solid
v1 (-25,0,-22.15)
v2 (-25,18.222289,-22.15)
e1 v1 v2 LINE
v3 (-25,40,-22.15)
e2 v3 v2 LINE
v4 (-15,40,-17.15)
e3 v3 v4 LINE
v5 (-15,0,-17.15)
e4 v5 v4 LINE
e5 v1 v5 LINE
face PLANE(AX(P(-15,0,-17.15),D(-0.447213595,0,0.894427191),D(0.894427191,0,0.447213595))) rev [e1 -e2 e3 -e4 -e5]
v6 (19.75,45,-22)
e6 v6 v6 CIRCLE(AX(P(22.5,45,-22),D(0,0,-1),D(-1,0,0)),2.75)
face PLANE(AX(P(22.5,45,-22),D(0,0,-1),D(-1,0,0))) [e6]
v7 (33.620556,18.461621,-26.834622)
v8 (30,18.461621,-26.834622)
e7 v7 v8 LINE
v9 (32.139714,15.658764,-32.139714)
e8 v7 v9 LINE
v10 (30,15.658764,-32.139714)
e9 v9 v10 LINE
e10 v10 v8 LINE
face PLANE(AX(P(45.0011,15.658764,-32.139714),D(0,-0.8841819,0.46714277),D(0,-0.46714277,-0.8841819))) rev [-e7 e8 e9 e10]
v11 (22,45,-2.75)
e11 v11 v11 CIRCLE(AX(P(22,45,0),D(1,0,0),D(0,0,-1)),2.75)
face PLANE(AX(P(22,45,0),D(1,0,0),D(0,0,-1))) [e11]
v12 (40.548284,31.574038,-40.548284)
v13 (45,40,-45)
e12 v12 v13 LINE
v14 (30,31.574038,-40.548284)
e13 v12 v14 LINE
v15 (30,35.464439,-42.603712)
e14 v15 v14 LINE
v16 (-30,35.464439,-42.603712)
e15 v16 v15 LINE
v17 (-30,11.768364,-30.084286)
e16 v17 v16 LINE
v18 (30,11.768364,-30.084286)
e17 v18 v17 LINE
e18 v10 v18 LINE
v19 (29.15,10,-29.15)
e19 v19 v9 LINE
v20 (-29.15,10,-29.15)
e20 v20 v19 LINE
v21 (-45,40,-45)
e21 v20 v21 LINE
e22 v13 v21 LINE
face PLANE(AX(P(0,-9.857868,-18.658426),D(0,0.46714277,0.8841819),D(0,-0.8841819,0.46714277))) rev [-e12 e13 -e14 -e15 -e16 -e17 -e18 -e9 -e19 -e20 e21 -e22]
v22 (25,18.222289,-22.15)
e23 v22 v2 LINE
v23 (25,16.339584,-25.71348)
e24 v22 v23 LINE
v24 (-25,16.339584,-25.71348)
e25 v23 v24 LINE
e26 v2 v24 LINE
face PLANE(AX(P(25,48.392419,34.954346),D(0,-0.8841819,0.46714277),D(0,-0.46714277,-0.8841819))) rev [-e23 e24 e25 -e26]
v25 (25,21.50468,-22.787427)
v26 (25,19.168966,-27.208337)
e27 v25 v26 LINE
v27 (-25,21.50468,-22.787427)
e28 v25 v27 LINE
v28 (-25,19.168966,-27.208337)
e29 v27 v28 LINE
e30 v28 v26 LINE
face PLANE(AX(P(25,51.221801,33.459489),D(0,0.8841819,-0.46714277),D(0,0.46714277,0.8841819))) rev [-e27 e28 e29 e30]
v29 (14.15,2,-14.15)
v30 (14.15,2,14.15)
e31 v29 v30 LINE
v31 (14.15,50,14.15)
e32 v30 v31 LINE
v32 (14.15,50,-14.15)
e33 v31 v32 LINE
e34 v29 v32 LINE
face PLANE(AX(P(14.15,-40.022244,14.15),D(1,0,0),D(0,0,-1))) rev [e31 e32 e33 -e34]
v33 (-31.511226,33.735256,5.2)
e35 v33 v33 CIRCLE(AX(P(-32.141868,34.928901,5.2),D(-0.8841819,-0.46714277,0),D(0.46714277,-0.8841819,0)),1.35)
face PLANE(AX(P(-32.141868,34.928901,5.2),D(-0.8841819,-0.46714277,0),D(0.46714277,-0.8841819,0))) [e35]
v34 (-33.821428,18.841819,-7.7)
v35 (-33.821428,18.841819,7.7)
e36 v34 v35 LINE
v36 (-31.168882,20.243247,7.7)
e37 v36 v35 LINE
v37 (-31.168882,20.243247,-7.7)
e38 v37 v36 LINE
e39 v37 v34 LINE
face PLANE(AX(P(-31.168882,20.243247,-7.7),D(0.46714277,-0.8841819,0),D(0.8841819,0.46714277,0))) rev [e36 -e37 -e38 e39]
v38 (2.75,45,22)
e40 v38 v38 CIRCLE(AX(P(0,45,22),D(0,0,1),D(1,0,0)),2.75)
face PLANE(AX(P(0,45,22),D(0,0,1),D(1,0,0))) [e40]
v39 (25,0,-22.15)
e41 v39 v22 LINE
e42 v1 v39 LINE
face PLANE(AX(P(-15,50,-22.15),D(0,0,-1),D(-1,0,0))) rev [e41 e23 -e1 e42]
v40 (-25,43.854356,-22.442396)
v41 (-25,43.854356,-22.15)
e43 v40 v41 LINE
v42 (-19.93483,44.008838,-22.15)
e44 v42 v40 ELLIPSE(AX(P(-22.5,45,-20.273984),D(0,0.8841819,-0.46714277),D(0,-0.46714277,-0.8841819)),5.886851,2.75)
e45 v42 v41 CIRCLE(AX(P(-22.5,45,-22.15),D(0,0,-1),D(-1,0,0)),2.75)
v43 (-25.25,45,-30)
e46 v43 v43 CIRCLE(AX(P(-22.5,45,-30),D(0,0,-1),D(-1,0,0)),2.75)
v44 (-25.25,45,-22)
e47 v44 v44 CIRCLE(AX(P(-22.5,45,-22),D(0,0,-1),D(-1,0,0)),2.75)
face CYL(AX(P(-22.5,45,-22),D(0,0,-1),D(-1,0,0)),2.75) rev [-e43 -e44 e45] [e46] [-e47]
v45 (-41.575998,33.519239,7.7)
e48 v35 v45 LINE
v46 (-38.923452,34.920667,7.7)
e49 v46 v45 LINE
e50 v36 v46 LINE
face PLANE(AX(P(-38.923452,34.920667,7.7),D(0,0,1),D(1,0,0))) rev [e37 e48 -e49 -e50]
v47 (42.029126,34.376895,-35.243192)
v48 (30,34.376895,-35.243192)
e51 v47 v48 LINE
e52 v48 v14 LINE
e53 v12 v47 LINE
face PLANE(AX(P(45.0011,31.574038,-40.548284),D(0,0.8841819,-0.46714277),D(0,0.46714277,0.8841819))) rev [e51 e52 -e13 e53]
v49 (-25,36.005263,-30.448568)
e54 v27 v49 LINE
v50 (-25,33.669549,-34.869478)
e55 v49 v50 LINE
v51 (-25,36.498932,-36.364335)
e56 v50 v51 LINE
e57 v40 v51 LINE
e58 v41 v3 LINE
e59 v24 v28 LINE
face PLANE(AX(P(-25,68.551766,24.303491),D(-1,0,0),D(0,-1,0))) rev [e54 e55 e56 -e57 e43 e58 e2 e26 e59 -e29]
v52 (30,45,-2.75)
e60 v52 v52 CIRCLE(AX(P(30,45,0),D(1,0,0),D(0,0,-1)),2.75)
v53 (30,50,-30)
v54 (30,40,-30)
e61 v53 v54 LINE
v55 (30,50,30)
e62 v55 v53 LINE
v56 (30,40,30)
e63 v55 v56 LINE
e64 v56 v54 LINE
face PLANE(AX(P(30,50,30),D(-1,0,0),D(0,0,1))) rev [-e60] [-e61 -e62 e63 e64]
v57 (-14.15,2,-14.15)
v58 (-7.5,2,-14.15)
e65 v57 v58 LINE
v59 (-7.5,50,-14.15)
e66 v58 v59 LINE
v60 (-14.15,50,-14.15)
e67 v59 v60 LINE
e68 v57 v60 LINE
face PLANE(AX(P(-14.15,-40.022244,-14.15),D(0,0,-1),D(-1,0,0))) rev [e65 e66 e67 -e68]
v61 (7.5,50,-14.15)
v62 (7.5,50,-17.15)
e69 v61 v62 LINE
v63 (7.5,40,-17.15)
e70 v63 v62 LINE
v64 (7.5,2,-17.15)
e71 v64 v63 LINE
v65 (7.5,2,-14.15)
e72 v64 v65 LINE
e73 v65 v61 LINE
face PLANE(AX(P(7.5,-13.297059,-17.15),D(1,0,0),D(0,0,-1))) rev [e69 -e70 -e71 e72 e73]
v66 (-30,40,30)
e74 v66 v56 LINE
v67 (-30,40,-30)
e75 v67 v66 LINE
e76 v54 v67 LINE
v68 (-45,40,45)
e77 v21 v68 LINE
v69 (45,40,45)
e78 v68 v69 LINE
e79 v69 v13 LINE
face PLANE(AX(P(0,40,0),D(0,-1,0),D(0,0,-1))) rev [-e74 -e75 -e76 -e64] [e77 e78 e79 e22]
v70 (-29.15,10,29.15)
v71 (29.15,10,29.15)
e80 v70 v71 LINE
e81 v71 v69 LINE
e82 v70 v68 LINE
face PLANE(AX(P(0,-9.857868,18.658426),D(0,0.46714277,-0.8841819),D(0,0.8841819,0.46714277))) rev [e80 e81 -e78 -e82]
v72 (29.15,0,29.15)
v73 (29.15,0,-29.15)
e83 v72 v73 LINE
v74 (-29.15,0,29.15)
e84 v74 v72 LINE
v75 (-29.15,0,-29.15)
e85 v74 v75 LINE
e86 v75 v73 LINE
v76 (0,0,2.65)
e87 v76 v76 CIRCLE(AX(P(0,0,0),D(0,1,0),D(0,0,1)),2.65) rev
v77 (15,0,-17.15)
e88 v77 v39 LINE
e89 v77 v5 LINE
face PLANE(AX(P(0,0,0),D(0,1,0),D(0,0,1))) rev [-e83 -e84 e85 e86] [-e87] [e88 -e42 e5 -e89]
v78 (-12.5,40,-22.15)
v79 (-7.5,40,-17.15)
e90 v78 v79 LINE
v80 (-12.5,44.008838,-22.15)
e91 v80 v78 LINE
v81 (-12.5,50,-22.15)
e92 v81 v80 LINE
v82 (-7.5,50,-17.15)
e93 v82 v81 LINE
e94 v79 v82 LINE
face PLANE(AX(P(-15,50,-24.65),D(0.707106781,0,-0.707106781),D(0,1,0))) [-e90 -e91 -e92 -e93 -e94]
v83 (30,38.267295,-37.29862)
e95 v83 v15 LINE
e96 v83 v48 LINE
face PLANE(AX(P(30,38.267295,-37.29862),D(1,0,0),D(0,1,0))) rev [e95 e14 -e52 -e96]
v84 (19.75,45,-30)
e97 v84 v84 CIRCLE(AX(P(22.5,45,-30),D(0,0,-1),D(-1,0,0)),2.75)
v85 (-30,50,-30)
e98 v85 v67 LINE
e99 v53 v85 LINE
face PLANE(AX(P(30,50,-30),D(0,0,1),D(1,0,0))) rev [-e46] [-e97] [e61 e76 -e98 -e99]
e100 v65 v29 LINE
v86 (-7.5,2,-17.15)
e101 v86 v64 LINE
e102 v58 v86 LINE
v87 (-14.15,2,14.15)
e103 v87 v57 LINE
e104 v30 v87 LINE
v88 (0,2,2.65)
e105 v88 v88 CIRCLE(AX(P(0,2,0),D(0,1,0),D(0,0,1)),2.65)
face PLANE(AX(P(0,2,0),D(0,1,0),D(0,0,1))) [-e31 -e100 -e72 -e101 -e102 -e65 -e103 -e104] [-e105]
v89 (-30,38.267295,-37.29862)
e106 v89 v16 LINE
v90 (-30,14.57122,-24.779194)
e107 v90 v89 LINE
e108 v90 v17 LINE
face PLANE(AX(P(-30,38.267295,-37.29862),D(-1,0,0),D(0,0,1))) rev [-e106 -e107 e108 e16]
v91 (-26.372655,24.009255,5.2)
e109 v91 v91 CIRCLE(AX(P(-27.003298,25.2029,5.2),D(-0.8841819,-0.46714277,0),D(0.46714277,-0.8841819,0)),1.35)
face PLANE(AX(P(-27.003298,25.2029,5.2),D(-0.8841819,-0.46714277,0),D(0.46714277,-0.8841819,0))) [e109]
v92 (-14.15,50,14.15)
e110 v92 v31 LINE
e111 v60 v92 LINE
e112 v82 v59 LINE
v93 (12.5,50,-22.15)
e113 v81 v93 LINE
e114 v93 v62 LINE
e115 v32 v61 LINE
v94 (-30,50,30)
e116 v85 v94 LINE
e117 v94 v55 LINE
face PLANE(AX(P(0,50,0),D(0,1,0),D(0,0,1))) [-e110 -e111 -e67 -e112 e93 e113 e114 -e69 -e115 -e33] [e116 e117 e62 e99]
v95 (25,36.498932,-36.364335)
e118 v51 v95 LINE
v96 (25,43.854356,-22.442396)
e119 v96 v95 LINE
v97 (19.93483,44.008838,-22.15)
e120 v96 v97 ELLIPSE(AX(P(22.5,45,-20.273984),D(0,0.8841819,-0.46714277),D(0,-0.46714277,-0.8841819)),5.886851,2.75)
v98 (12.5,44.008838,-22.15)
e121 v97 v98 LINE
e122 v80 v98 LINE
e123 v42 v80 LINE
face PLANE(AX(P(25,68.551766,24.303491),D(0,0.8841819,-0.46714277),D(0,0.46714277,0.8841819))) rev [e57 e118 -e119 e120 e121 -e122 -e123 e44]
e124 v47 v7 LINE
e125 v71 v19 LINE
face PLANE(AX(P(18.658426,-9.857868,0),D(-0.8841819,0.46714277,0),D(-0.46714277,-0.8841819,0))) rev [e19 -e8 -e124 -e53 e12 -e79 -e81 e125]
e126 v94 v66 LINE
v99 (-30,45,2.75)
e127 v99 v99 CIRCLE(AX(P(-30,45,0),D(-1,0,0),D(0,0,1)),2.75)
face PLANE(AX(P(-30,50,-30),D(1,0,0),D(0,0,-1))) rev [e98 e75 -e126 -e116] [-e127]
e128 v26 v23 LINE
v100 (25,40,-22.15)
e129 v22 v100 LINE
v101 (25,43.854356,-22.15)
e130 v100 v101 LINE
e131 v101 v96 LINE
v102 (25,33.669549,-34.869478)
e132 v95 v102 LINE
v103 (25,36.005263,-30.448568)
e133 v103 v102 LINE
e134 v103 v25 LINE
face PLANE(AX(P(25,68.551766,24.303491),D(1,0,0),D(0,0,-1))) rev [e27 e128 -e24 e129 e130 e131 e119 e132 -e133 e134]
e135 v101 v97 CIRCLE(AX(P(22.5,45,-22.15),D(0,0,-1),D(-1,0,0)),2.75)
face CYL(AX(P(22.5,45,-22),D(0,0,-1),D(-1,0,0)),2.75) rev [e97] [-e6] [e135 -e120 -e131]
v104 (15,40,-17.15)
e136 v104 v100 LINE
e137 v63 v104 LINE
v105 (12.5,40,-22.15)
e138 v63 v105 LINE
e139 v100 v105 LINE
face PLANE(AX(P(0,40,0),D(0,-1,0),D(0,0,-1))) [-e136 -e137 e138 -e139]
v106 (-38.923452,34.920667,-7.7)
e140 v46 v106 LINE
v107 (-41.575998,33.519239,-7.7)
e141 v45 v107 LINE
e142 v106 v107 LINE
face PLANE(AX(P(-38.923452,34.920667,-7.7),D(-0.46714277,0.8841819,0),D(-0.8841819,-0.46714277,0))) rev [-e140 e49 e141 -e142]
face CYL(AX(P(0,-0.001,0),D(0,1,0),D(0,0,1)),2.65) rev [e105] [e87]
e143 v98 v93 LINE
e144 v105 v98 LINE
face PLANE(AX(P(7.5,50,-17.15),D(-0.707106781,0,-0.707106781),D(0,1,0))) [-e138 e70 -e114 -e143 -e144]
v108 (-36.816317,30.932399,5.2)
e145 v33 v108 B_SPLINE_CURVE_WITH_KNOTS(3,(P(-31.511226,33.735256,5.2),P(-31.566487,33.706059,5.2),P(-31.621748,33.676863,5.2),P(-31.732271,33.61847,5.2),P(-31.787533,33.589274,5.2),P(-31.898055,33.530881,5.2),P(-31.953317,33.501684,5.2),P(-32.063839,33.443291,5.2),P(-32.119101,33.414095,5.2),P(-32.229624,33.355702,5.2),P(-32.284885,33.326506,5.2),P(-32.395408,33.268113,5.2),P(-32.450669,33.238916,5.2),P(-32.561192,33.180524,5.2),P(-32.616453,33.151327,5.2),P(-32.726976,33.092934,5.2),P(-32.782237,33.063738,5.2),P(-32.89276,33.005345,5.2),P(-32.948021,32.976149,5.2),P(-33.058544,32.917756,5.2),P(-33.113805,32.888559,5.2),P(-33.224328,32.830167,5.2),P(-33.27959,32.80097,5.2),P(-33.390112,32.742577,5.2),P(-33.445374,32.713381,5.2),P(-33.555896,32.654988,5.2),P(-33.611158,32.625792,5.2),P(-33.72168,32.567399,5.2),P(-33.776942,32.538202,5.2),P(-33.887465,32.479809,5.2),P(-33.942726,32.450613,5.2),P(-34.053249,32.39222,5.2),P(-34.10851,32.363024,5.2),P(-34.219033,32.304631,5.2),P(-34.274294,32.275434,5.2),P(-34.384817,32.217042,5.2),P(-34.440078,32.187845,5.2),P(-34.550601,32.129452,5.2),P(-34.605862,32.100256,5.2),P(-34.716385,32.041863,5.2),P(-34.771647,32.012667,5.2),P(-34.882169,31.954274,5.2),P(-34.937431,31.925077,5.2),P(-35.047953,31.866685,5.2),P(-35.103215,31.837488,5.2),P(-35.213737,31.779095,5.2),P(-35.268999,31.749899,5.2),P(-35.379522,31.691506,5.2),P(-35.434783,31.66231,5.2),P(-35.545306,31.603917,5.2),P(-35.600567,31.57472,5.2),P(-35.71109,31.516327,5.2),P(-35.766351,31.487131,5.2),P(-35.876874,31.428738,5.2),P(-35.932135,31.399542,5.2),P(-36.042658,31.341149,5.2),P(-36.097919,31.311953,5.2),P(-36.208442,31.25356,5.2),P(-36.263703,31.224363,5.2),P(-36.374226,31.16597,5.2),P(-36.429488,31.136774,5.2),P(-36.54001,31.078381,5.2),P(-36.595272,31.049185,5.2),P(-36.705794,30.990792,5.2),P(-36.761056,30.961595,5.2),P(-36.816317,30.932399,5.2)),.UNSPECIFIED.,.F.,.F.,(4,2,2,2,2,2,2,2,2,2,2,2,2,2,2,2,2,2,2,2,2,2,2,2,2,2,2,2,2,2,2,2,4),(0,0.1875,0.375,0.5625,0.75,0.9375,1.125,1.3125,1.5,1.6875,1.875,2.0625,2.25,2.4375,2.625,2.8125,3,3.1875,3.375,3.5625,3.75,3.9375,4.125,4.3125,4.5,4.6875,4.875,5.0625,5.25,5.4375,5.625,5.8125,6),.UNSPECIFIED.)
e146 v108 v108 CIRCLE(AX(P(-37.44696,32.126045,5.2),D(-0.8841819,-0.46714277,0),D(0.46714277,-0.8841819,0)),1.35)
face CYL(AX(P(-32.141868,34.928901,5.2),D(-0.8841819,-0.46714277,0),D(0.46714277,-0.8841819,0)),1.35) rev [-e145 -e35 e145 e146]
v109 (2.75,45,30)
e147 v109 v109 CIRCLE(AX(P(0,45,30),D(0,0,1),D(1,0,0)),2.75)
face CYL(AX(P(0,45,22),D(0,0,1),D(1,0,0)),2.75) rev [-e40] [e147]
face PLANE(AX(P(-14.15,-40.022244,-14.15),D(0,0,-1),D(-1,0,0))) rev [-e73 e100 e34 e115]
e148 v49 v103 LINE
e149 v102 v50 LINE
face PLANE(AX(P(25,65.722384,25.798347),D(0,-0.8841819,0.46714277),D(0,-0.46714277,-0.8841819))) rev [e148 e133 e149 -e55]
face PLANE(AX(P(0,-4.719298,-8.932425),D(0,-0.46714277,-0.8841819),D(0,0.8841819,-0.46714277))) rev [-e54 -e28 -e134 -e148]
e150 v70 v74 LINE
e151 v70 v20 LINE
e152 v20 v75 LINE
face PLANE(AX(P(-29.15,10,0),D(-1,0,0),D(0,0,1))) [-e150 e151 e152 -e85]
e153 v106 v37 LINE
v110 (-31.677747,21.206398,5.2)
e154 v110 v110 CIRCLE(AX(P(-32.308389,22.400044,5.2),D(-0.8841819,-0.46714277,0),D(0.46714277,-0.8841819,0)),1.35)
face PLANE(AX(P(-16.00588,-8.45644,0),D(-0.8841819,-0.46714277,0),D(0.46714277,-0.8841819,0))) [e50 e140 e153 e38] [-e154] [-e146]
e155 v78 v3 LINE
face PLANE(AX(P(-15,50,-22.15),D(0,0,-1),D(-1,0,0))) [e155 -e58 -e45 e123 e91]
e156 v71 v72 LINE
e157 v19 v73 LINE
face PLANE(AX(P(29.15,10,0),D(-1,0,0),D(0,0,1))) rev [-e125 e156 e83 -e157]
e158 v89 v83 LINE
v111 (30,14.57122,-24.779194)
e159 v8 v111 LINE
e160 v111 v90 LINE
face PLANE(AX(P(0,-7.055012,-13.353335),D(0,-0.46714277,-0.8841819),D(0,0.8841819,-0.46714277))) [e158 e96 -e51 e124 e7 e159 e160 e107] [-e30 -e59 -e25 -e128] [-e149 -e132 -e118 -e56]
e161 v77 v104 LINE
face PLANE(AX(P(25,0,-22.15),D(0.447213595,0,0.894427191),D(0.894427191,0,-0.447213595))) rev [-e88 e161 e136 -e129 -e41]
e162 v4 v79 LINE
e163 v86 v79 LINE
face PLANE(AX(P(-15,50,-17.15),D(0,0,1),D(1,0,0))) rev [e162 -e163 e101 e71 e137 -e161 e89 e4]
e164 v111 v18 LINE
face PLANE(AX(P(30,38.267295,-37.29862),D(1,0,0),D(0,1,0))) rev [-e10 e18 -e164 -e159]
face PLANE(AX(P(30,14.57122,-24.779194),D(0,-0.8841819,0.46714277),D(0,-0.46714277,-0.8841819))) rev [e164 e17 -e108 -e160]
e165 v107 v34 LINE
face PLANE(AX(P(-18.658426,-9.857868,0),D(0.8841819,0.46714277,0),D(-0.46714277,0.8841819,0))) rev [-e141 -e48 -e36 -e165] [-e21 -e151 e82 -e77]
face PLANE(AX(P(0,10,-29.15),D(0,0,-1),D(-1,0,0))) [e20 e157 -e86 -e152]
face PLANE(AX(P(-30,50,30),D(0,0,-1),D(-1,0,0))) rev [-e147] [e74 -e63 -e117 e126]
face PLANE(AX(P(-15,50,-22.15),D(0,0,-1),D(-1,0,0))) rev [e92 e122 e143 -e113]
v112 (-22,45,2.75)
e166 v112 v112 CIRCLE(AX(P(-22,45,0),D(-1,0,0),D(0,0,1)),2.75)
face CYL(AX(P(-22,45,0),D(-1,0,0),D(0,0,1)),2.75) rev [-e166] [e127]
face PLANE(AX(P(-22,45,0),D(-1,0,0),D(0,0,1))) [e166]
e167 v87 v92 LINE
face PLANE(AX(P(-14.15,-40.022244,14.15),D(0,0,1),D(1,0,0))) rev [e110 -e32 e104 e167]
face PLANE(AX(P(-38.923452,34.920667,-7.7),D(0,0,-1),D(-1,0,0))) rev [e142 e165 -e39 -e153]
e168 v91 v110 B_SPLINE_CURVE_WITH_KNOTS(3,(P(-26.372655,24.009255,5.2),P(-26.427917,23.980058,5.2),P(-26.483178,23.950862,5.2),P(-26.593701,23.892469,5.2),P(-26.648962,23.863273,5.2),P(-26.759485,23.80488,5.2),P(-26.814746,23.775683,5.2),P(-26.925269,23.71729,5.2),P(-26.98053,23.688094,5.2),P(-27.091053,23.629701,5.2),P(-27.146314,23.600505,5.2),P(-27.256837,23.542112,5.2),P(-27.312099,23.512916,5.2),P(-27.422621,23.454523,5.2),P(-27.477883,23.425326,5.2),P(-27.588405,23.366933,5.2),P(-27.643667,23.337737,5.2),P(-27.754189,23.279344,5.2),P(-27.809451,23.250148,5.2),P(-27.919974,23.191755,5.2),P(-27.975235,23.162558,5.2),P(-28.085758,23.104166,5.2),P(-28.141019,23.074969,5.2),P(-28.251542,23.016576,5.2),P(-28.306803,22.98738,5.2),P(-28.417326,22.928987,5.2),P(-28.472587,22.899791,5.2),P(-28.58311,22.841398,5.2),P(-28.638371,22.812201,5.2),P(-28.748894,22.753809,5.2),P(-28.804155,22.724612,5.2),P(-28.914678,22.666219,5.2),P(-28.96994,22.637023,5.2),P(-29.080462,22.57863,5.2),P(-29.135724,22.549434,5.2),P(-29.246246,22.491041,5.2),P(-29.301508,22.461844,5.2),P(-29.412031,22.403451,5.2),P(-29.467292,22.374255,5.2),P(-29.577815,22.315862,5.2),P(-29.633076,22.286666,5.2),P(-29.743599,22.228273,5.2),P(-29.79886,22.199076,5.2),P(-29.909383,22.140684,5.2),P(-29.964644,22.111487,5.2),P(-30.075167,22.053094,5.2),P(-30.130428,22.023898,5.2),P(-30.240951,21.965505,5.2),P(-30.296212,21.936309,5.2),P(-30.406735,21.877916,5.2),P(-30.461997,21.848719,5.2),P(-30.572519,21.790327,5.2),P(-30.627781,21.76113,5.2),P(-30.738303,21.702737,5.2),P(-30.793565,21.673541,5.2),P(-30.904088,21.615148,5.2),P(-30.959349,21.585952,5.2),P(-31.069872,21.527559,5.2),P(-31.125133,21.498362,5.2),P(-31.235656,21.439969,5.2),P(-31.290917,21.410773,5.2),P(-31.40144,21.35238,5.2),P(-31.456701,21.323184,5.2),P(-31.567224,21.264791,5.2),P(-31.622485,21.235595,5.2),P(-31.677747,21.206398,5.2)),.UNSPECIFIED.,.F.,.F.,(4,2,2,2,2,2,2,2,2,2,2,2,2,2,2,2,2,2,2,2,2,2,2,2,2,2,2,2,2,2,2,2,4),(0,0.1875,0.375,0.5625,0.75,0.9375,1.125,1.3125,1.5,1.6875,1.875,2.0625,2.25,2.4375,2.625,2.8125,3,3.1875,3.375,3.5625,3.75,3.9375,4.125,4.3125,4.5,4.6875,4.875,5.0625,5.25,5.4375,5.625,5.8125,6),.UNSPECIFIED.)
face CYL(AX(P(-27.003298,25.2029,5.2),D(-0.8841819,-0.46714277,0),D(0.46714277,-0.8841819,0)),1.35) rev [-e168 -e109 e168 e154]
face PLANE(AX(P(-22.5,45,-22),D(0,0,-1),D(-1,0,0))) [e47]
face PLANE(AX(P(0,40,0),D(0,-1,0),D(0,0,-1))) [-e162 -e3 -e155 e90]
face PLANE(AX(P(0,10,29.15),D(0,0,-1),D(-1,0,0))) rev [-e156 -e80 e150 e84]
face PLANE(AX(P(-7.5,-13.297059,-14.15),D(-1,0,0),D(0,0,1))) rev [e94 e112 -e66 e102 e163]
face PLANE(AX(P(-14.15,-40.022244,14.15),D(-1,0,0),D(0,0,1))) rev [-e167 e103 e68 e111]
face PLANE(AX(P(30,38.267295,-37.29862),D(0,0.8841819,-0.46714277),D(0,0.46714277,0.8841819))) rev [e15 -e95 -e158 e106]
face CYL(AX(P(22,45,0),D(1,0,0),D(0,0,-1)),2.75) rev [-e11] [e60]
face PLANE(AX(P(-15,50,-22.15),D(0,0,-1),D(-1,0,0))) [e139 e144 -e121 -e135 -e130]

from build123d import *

# Parameters (mm, degrees)
SKETCH1_W                = 58.3
SKETCH1_H                = 58.3
SKETCH1_W_2              = 28.3
SKETCH1_H_2              = 28.3
BOSS_EXTRUDE1_DEPTH      = 10
SKETCH4_W                = 60
SKETCH4_H                = 60
BOSS_EXTRUDE2_DEPTH      = 10
SKETCH6_W                = 60
SKETCH6_H                = 26.8
ESP32_DEPTH              = 6
SKETCH8_W                = 28.3
SKETCH8_H                = 28.3
CUT_EXTRUDE3_DEPTH       = 48
SKETCH10_W               = 30
SKETCH10_H               = 5
CUT_EXTRUDE5_DEPTH       = 50
CUT_EXTRUDE2_REACH       = 95.195
SKETCH7_W                = 50
SKETCH7_H                = 3.2
CUT_EXTRUDE6_START       = -10
CUT_EXTRUDE6_DEPTH       = 71.932070392
CUT_EXTRUDE7_START       = -25
CUT_EXTRUDE7_DEPTH       = 50
CUT_EXTRUDE8_REACH       = 102.747
SKETCH14_W               = 15
SKETCH14_H               = 3
CUT_EXTRUDE9_DEPTH       = 48
CHAMFER1_SIZE            = 7.5
CUT_EXTRUDE10_REACH      = 81.712
SKETCH15_R               = 2.65
SKETCH16_W               = 15.4
SKETCH16_H               = 16.6
CANBUS_DEPTH             = 3
SKETCH18_R               = 1.35
M2_CANBUS_HEAT_SET_DEPTH = 6
SKETCH19_R               = 2.75
CUT_EXTRUDE13_DEPTH      = 8
SKETCH20_R               = 2.75
CUT_EXTRUDE14_DEPTH      = 8
SKETCH21_R               = 2.75
CUT_EXTRUDE15_DEPTH      = 8
CUT_EXTRUDE16_START      = -8
SKETCH22_R               = 2.75
CUT_EXTRUDE16_DEPTH      = 8


# Read off the part's stored shape, not the designer's step: Cut-Extrude7
with BuildPart() as part:
    # Sketch1 → Boss-Extrude1 (new body)
    # profile 1 of 2: a face of its own
    with BuildSketch(Plane(origin=(0, 0, 0), x_dir=(1, 0, 0), z_dir=(0, 1, 0))):
        Rectangle(SKETCH1_W, SKETCH1_H)
        Rectangle(SKETCH1_W_2, SKETCH1_H_2, mode=Mode.SUBTRACT)
    # profile 2 of 2: a face of its own
    with BuildSketch(Plane(origin=(0, 0, 0), x_dir=(1, 0, 0), z_dir=(0, 1, 0))):
        Rectangle(SKETCH1_W_2, SKETCH1_H_2)
    extrude(amount=BOSS_EXTRUDE1_DEPTH)

    # Sketch2 → section 1 of loft1
    with BuildSketch(Plane(origin=(0, 40, 0), x_dir=(1, 0, 0), z_dir=(0, 1, 0)), mode=Mode.PRIVATE) as loft1_s1:
        with BuildLine():
            Line((-45, -45), (45, -45))
            Line((45, -45), (45, 45))
            Line((45, 45), (-45, 45))
            Line((-45, 45), (-45, -45))
        make_face()
    # loft from a face of the part (loft1)
    loft([part.faces().sort_by_distance((0, 10, 0))[0], loft1_s1.sketch])

    # Sketch4 → Boss-Extrude2 (add)
    with BuildSketch(Plane(origin=(0, 40, 0), x_dir=(1, 0, 0), z_dir=(0, 1, 0))):
        Rectangle(SKETCH4_W, SKETCH4_H)
    extrude(amount=BOSS_EXTRUDE2_DEPTH)

    # Sketch6 → ESP32 (cut)
    with BuildSketch(Plane(origin=(0, -9.857868483, -18.658426151), x_dir=(-1, 0, 0), z_dir=(0, -0.4671427704257183, -0.8841818998594039))):
        with Locations((0, 37.859030757)):
            Rectangle(SKETCH6_W, SKETCH6_H)
    extrude(amount=-ESP32_DEPTH, mode=Mode.SUBTRACT)

    # Sketch8 → Cut-Extrude3 (cut)
    with BuildSketch(Plane(origin=(0, 50, 0), x_dir=(1, 0, 0), z_dir=(0, 1, 0))):
        Rectangle(SKETCH8_W, SKETCH8_H)
    extrude(amount=-CUT_EXTRUDE3_DEPTH, mode=Mode.SUBTRACT)

    # Sketch10 → Cut-Extrude5 (cut)
    with BuildSketch(Plane(origin=(0, 0, 0), x_dir=(-1, 0, 0), z_dir=(0, -1, 0))):
        with Locations((0, 19.65)):
            Rectangle(SKETCH10_W, SKETCH10_H)
    extrude(amount=-CUT_EXTRUDE5_DEPTH, mode=Mode.SUBTRACT)

    # Cut-Extrude2: up to this plane
    cut_extrude2_end = Plane(origin=(-15, 50, -22.15), z_dir=(0, 0, -1))
    # Sketch7 → Cut-Extrude2 (cut, up to the surface)
    with BuildSketch(Plane(origin=(0, -7.055011861, -13.353334752), x_dir=(-1, 0, 0), z_dir=(0, -0.46714277042571845, -0.8841818998594037)), mode=Mode.PRIVATE) as cut_extrude2_sk1:
        with Locations((0, 47.659030757)):
            Rectangle(SKETCH7_W, SKETCH7_H)
    cut_extrude2_tool1 = split(extrude(cut_extrude2_sk1.sketch, amount=-CUT_EXTRUDE2_REACH, mode=Mode.PRIVATE), bisect_by=cut_extrude2_end, keep=Keep.BOTH, mode=Mode.PRIVATE)
    add(cut_extrude2_tool1.solids().sort_by_distance((0, 35.08424, -35.616906))[0], mode=Mode.SUBTRACT)
    # Sketch7 → Cut-Extrude2 (cut, up to the surface)
    with BuildSketch(Plane(origin=(0, -7.055011861, -13.353334752), x_dir=(-1, 0, 0), z_dir=(0, -0.46714277042571845, -0.8841818998594037)), mode=Mode.PRIVATE) as cut_extrude2_sk2:
        with Locations((0, 28.059030757)):
            Rectangle(SKETCH7_W, SKETCH7_H)
    cut_extrude2_tool2 = split(extrude(cut_extrude2_sk2.sketch, amount=-CUT_EXTRUDE2_REACH, mode=Mode.PRIVATE), bisect_by=cut_extrude2_end, keep=Keep.BOTH, mode=Mode.PRIVATE)
    add(cut_extrude2_tool2.solids().sort_by_distance((0, 17.754275, -26.460908))[0], mode=Mode.SUBTRACT)

    # Sketch11 → Cut-Extrude6 (cut, through all)
    with BuildSketch(Plane(origin=(0, 50, 0), x_dir=(1, 0, 0), z_dir=(0, 1, 0)).offset(CUT_EXTRUDE6_START)):
        Polygon((-25, 22.15), (25, 22.15), (15, 17.15), (-15, 17.15), align=None)
    extrude(amount=-CUT_EXTRUDE6_DEPTH, mode=Mode.SUBTRACT)

    # Cut-Extrude7 outline → Cut-Extrude7 (cut)
    with BuildSketch(Plane.YZ.offset(CUT_EXTRUDE7_START)):
        Polygon((40.38967366, -22.15), (21.841454111, -22.15), (21.504680154, -22.787427049), (36.005263311, -30.448568484), align=None)
    extrude(amount=CUT_EXTRUDE7_DEPTH, mode=Mode.SUBTRACT)

    # Cut-Extrude8: up to this plane
    cut_extrude8_end = Plane(origin=(18.658426151, -9.857868483, 0), z_dir=(-0.884181899859404, 0.4671427704257181, 0))
    # Sketch13 → Cut-Extrude8 (cut, up to the surface)
    with BuildSketch(Plane.ZY.offset(-30), mode=Mode.PRIVATE) as cut_extrude8_sk1:
        Polygon((-32.139713731, 15.658764159), (-40.548283598, 31.574038357), (-35.243192199, 34.376894979), (-26.834622332, 18.461620782), align=None)
    cut_extrude8_tool1 = split(extrude(cut_extrude8_sk1.sketch, amount=-CUT_EXTRUDE8_REACH, mode=Mode.PRIVATE), bisect_by=cut_extrude8_end, keep=Keep.BOTH, mode=Mode.PRIVATE)
    add(cut_extrude8_tool1.solids().sort_by_distance((30, 25.01783, -33.691453))[0], mode=Mode.SUBTRACT)

    # Sketch14 → Cut-Extrude9 (cut)
    with BuildSketch(Plane(origin=(0, 50, 0), x_dir=(1, 0, 0), z_dir=(0, 1, 0))):
        with Locations((0, 15.65)):
            Rectangle(SKETCH14_W, SKETCH14_H)
    extrude(amount=-CUT_EXTRUDE9_DEPTH, mode=Mode.SUBTRACT)

    # Chamfer1
    # the kernel refuses this chamfer: 7.5 mm, written as the material it adds along each edge
    with BuildSketch(Plane(origin=(15, 40, -17.15), x_dir=(-0.9996219169112968, 0, 0.02749587661058632), z_dir=(0, 1, 0))) as chamfer1_piece_1_section:
        Polygon((CHAMFER1_SIZE * 0.999621916911, -CHAMFER1_SIZE * 0.0274958766106), (-CHAMFER1_SIZE * 0.0274958766106, -CHAMFER1_SIZE * 0.999621916911), (0, 0), align=None)
    chamfer1_piece_1 = extrude(amount=10, mode=Mode.PRIVATE)
    chamfer1_piece_1 = split(chamfer1_piece_1, bisect_by=Plane(origin=(12.200765376, 42.822931518, -22.15), z_dir=(0, 0, 1)), keep=Keep.TOP, mode=Mode.PRIVATE)
    add(chamfer1_piece_1)
    with BuildSketch(Plane(origin=(-15, 40, -17.15), x_dir=(0.9996219169112968, 0, 0.02749587661058632), z_dir=(0, 1, 0))) as chamfer1_piece_2_section:
        Polygon((CHAMFER1_SIZE * 0.999621916911, CHAMFER1_SIZE * 0.0274958766106), (-CHAMFER1_SIZE * 0.0274958766106, CHAMFER1_SIZE * 0.999621916911), (0, 0), align=None)
    chamfer1_piece_2 = extrude(amount=10, mode=Mode.PRIVATE)
    chamfer1_piece_2 = split(chamfer1_piece_2, bisect_by=Plane(origin=(-12.200765376, 42.822931518, -22.15), z_dir=(0, 0, 1)), keep=Keep.TOP, mode=Mode.PRIVATE)
    add(chamfer1_piece_2)

    # Sketch15 → Cut-Extrude10 (cut, up to next)
    with BuildSketch(Plane(origin=(0, 2, 0), x_dir=(1, 0, 0), z_dir=(0, 1, 0)), mode=Mode.PRIVATE) as cut_extrude10_sk1:
        with Locations(Location((0, 0, 0), (0, 0, 270))):
            Circle(SKETCH15_R)
    cut_extrude10_tool1 = extrude(cut_extrude10_sk1.sketch, amount=-CUT_EXTRUDE10_REACH, mode=Mode.PRIVATE) & part.part
    add(cut_extrude10_tool1.solids().sort_by_distance((0, 2, 0))[0], mode=Mode.SUBTRACT)

    # Sketch16 → CANbus (cut)
    with BuildSketch(Plane(origin=(-18.658426151, -9.857868483, 0), x_dir=(0, 0, 1), z_dir=(-0.8841818998594037, -0.46714277042571845, 0))):
        with Locations((0, 40.759030757)):
            Rectangle(SKETCH16_W, SKETCH16_H)
    extrude(amount=-CANBUS_DEPTH, mode=Mode.SUBTRACT)

    # Sketch18 → M2-CANbus-Heat-Set (cut)
    with BuildSketch(Plane(origin=(-16.005880452, -8.456440172, 0), x_dir=(0, 0, 1), z_dir=(-0.8841818998594035, -0.46714277042571867, 0))):
        with Locations(Location((5.2, 45.898343703, 0), (0, 0, 270))):
            Circle(SKETCH18_R)
        with Locations(Location((5.2, 34.898343703, 0), (0, 0, 270))):
            Circle(SKETCH18_R)
    extrude(amount=-M2_CANBUS_HEAT_SET_DEPTH, mode=Mode.SUBTRACT)

    # Sketch19 → Cut-Extrude13 (cut)
    with BuildSketch(Plane(origin=(0, 0, -30), x_dir=(-1, 0, 0), z_dir=(0, 0, -1))):
        with Locations((-22.5, 45)):
            Circle(SKETCH19_R)
        with Locations((22.5, 45)):
            Circle(SKETCH19_R)
    extrude(amount=-CUT_EXTRUDE13_DEPTH, mode=Mode.SUBTRACT)

    # Sketch20 → Cut-Extrude14 (cut)
    with BuildSketch(Plane(origin=(30, 0, 0), x_dir=(0, 0, -1), z_dir=(1, 0, 0))):
        with Locations((0, 45)):
            Circle(SKETCH20_R)
    extrude(amount=-CUT_EXTRUDE14_DEPTH, mode=Mode.SUBTRACT)

    # Sketch21 → Cut-Extrude15 (cut)
    with BuildSketch(Plane.XY.offset(30)):
        with Locations((0, 45)):
            Circle(SKETCH21_R)
    extrude(amount=-CUT_EXTRUDE15_DEPTH, mode=Mode.SUBTRACT)

    # Sketch22 → Cut-Extrude16 (cut)
    with BuildSketch(Plane.ZY.offset(30).offset(CUT_EXTRUDE16_START)):
        with Locations(Location((0, 45, 0), (0, 0, 180))):
            Circle(SKETCH22_R)
    extrude(amount=CUT_EXTRUDE16_DEPTH, mode=Mode.SUBTRACT)


solid = part.part
